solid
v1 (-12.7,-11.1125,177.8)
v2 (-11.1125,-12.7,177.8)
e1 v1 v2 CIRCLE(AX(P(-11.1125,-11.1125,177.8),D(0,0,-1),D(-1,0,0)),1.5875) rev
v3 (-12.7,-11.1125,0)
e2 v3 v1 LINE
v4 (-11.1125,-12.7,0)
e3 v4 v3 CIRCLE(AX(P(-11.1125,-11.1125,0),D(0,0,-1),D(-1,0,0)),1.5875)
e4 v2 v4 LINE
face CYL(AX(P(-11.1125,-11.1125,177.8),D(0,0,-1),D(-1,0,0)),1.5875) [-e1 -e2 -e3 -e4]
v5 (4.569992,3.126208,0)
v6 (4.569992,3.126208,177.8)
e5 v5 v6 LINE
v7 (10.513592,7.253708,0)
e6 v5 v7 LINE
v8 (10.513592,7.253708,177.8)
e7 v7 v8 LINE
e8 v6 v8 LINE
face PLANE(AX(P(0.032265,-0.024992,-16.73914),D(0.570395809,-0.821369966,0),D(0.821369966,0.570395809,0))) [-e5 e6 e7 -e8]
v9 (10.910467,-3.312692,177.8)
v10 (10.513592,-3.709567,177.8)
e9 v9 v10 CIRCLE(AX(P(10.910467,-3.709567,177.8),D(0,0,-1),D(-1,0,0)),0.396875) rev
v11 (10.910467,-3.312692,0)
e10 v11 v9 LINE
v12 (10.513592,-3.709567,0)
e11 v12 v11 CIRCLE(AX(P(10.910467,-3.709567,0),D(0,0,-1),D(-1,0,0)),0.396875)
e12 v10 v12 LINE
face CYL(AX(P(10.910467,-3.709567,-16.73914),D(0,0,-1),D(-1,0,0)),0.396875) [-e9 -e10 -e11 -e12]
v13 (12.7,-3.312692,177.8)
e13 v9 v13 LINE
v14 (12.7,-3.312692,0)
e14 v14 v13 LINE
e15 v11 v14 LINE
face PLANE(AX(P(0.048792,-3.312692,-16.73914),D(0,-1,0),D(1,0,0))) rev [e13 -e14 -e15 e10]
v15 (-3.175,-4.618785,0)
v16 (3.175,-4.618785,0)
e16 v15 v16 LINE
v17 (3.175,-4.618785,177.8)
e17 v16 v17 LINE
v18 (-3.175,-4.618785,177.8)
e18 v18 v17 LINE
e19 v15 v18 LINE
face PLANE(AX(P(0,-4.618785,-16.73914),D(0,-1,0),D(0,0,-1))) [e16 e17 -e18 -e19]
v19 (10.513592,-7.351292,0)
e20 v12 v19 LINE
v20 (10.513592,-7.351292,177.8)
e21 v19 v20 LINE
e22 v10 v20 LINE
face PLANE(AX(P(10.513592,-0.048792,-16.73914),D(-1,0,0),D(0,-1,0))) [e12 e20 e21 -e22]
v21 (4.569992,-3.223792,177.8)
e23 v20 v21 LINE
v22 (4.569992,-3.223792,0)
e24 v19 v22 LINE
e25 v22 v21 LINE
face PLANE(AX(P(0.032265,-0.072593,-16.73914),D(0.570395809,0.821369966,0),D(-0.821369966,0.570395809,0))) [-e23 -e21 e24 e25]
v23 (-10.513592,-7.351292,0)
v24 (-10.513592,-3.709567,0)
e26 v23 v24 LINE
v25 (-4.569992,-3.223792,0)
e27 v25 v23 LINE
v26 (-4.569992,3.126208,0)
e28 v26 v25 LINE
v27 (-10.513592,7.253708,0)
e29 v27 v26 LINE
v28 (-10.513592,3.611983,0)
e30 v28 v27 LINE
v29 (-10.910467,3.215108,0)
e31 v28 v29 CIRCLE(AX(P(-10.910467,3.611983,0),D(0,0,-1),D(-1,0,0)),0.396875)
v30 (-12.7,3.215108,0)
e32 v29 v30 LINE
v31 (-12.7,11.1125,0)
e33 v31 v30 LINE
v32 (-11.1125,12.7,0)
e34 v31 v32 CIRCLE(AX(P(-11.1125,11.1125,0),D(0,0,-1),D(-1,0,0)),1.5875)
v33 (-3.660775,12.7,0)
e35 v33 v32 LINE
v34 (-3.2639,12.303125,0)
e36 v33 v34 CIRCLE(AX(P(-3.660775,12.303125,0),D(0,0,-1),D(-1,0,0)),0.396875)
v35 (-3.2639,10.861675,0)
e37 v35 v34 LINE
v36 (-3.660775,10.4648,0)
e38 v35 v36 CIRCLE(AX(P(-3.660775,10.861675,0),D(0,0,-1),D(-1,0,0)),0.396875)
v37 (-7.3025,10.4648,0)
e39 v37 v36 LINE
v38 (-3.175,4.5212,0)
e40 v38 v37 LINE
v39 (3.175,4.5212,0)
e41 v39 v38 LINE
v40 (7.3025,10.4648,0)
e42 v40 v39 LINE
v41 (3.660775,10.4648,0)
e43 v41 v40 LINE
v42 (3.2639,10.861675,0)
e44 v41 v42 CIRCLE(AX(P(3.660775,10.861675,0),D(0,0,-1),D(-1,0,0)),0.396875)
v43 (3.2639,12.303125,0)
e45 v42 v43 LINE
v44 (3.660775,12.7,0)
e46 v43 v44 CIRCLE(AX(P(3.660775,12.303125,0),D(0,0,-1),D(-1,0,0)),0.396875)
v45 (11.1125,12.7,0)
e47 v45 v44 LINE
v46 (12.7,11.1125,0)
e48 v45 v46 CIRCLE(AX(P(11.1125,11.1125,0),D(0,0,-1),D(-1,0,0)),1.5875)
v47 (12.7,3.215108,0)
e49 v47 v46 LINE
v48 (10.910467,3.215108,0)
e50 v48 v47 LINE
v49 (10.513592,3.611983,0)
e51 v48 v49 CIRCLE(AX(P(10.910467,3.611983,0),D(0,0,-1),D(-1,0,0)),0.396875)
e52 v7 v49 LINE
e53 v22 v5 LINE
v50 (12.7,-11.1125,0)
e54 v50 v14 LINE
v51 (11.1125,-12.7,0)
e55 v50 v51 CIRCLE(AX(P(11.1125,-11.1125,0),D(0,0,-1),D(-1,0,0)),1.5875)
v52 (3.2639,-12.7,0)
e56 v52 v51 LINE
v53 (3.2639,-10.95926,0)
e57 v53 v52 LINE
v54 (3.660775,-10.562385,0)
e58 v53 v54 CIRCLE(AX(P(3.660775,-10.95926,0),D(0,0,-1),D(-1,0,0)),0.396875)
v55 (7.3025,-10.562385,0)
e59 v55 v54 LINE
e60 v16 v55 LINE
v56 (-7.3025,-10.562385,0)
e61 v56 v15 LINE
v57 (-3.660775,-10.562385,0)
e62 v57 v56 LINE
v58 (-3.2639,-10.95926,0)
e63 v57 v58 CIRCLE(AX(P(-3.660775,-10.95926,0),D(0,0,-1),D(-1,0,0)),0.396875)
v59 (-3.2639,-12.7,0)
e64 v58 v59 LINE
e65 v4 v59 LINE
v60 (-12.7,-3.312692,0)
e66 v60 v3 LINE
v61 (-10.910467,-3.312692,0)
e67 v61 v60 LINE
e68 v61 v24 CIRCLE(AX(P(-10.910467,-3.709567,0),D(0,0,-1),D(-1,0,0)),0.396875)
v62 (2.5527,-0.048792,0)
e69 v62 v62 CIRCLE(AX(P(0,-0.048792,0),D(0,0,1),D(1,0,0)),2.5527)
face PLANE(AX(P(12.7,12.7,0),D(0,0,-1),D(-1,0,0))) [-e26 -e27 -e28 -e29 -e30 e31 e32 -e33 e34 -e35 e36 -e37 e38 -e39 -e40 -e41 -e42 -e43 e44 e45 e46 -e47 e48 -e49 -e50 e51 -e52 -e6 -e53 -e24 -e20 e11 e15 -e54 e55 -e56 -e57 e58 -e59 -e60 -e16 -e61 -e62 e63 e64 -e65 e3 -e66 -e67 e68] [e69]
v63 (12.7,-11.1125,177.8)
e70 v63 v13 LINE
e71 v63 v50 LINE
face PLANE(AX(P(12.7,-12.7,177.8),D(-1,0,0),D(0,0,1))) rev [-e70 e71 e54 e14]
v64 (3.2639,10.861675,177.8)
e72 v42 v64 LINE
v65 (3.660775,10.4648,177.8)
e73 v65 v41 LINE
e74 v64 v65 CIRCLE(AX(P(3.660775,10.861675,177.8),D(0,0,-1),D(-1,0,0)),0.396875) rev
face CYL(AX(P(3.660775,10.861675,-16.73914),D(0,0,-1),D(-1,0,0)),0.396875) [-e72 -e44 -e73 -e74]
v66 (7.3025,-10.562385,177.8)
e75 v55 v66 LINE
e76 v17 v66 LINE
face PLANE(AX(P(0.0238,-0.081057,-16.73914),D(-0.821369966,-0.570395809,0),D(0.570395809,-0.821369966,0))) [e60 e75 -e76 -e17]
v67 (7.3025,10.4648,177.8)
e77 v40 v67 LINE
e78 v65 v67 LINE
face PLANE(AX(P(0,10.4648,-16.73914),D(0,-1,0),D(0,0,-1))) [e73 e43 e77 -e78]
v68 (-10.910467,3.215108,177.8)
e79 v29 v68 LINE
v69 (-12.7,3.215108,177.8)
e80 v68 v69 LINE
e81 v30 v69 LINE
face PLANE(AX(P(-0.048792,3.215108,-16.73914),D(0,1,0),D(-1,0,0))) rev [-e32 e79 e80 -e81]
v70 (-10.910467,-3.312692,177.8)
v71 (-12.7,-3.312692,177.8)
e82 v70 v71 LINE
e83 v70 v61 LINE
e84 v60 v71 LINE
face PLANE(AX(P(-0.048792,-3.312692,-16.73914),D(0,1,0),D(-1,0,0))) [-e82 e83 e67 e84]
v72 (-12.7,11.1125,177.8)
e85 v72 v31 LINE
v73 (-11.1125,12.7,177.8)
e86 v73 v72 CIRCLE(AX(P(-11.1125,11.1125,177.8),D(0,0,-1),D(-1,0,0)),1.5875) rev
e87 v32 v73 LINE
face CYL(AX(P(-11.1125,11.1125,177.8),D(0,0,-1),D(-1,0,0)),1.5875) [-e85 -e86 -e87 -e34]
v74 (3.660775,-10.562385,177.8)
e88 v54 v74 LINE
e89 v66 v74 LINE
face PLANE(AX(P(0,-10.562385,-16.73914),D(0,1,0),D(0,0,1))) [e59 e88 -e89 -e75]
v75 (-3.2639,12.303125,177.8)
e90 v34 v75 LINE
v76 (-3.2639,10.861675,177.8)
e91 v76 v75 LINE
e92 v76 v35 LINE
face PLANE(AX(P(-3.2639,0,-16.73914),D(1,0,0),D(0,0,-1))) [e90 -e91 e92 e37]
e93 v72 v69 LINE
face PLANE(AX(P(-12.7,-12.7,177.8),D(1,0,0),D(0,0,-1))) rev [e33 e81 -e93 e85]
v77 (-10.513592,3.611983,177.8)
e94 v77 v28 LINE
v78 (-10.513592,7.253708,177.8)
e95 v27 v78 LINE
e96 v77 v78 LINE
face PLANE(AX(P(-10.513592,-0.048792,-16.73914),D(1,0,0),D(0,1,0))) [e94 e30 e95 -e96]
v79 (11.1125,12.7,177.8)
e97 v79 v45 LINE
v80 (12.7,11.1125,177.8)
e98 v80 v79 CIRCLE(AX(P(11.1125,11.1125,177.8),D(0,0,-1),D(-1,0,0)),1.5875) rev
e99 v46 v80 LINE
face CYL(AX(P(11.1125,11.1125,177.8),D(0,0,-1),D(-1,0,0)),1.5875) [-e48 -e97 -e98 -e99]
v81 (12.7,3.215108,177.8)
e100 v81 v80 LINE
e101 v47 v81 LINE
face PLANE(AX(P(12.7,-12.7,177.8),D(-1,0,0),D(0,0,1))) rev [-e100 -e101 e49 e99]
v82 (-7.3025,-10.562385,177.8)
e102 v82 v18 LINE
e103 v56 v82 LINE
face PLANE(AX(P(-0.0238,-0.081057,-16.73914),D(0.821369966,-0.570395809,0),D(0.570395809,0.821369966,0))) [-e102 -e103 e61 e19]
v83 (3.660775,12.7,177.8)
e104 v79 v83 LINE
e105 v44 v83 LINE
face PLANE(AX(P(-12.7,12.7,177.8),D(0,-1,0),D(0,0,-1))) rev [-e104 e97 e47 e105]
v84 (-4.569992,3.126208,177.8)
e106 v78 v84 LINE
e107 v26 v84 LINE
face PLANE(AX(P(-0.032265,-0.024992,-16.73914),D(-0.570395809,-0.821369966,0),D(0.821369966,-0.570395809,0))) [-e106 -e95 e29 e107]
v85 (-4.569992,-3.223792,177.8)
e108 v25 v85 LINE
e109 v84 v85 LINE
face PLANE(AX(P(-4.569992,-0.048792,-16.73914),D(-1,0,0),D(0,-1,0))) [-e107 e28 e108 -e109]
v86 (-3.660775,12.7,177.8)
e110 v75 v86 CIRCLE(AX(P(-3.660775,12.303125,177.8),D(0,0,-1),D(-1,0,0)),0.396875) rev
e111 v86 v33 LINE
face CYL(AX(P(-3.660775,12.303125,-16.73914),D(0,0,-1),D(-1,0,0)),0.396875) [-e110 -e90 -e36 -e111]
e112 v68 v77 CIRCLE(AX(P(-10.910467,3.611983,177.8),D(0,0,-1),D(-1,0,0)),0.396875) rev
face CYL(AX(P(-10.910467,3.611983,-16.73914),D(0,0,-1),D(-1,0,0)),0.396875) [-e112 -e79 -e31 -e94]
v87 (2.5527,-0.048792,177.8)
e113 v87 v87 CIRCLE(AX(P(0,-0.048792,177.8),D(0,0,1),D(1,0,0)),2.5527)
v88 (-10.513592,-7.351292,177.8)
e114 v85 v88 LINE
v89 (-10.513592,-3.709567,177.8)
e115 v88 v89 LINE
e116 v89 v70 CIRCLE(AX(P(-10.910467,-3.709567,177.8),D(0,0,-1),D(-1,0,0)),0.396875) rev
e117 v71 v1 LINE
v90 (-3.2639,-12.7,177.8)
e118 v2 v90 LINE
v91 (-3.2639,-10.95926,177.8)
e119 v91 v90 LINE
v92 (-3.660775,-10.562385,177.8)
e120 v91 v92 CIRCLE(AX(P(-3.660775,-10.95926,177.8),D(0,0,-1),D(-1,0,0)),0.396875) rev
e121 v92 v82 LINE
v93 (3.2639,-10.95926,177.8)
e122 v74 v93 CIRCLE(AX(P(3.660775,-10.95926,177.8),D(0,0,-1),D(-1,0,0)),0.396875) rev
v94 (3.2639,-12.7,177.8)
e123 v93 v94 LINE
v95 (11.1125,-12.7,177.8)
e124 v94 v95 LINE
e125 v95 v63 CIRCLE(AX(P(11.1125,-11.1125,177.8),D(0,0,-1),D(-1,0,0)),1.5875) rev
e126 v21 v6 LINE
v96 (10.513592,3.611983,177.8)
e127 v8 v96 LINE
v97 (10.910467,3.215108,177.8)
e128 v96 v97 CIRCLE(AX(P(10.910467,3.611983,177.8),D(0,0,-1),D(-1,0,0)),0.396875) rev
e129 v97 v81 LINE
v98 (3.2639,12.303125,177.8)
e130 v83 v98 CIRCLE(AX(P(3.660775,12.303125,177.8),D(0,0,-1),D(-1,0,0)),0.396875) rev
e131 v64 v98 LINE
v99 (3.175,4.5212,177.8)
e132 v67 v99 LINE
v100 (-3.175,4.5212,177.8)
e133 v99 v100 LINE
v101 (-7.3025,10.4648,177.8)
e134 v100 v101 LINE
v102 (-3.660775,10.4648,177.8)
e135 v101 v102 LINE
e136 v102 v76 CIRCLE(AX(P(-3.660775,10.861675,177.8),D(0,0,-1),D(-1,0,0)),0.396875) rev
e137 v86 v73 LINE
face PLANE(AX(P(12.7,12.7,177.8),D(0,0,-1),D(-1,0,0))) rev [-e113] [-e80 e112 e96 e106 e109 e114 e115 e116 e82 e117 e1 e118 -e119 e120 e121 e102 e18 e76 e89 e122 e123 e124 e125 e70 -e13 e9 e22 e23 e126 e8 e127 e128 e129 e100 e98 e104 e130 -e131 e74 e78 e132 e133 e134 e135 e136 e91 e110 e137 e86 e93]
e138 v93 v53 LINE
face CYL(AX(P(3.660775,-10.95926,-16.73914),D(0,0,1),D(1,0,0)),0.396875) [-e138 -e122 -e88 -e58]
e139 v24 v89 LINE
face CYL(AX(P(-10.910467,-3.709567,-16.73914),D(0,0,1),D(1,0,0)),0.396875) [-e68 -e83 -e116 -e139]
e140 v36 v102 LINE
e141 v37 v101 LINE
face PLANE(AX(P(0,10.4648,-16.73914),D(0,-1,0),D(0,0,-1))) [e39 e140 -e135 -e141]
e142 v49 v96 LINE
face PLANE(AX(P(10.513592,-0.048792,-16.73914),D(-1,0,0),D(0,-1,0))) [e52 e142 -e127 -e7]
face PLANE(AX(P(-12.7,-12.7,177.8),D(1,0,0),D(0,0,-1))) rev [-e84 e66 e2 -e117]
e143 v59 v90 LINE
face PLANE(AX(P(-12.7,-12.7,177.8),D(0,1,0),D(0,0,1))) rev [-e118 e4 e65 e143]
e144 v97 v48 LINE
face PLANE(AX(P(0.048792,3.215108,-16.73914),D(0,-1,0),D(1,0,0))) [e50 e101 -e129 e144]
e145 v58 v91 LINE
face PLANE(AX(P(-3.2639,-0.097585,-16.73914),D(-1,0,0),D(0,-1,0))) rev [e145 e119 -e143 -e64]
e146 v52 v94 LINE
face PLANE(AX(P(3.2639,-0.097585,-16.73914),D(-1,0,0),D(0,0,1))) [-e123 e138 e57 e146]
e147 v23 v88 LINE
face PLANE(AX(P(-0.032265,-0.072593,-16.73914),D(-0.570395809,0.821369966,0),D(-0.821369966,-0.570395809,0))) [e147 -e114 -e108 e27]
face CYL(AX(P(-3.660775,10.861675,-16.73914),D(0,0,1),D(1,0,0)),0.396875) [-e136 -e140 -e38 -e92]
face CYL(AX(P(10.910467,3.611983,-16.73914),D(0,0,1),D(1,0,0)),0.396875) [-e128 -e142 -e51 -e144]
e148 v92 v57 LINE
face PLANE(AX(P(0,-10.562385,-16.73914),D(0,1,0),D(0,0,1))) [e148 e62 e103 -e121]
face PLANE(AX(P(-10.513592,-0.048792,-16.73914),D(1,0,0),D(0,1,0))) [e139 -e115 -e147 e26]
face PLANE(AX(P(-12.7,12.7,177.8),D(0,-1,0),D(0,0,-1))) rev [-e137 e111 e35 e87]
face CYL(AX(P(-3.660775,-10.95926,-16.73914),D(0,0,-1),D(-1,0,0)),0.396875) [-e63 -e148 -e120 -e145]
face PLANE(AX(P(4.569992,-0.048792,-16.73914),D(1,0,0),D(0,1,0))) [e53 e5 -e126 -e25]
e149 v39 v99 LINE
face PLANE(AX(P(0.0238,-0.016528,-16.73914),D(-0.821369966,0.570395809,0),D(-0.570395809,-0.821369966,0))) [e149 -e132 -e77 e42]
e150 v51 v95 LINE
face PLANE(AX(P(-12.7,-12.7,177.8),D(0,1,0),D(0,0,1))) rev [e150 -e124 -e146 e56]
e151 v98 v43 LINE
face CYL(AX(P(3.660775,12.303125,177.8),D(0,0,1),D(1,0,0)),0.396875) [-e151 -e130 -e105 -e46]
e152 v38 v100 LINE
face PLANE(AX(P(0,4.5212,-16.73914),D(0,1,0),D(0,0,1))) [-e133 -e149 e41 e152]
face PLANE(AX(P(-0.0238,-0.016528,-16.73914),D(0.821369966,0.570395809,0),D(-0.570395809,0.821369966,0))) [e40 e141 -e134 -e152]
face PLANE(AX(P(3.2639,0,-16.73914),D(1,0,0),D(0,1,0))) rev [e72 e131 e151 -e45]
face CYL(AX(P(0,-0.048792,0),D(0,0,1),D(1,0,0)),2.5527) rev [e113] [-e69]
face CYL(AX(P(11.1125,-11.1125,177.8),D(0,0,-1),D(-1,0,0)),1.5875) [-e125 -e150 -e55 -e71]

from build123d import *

# Parameters (mm, degrees)
SKETCH1_W           = 25.4
SKETCH1_H           = 25.4
BOSS_EXTRUDE1_DEPTH = 177.8
FILLET1_R           = 1.5875
HOLE1_OUTLINE_R     = 2.5527
HOLE1_DEPTH         = 177.8
SKETCH7_W           = 6.5278
SKETCH7_H           = 2.2352
CUT_EXTRUDE2_DEPTH  = 177.8
FILLET4_R           = 0.396875
CIRPATTERN2_DEPTH   = 177.8


# Read off the part's stored shape, not the designer's step: Hole1, CirPattern2
with BuildPart() as part:
    # Sketch1 → Boss-Extrude1 (new body)
    with BuildSketch(Plane.XY):
        Rectangle(SKETCH1_W, SKETCH1_H)
    extrude(amount=BOSS_EXTRUDE1_DEPTH)

    # Fillet1
    fillet1_edges = [part.edges().sort_by_distance(p)[0] for p in [
        (12.7, -12.7, 88.9),
        (-12.7, -12.7, 88.9),
        (-12.7, 12.7, 88.9),
        (12.7, 12.7, 88.9),
    ]]
    fillet(fillet1_edges, radius=FILLET1_R)

    # Hole1 outline → Hole1 (cut)
    with BuildSketch(Plane.XY):
        with Locations((0, -0.048792482)):
            Circle(HOLE1_OUTLINE_R)
    extrude(amount=HOLE1_DEPTH, mode=Mode.SUBTRACT)

    # Sketch7 → Cut-Extrude2 (cut)
    with BuildSketch(Plane.XY.offset(177.8)):
        with Locations((0, 11.5824)):
            Rectangle(SKETCH7_W, SKETCH7_H)
        Polygon((-3.175, 4.5212), (-7.3025, 10.4648), (7.3025, 10.4648), (3.175, 4.5212), align=None)
    extrude(amount=-CUT_EXTRUDE2_DEPTH, mode=Mode.SUBTRACT)

    # Fillet4
    fillet4_edges = [part.edges().sort_by_distance(p)[0] for p in [
        (-3.2639, 10.4648, 88.9),
        (-3.2639, 12.7, 88.9),
        (3.2639, 12.7, 88.9),
        (3.2639, 10.4648, 88.9),
    ]]
    fillet(fillet4_edges, radius=FILLET4_R)

    # CirPattern2 outline → CirPattern2 (cut)
    with BuildSketch(Plane.XY):
        with BuildLine():
            ThreePointArc((-3.660775, -10.562384964), (-3.380141996, -10.67862696), (-3.2639, -10.959259964))
            Line((-3.2639, -10.959259964), (-3.2639, -12.7))
            Line((-3.2639, -12.7), (3.2639, -12.7))
            Line((3.2639, -12.7), (3.2639, -10.959259964))
            ThreePointArc((3.2639, -10.959259964), (3.380141996, -10.67862696), (3.660775, -10.562384964))
            Line((3.660775, -10.562384964), (7.3025, -10.562384964))
            Line((7.3025, -10.562384964), (3.175, -4.618784964))
            Line((3.175, -4.618784964), (-3.175, -4.618784964))
            Line((-3.175, -4.618784964), (-7.3025, -10.562384964))
            Line((-7.3025, -10.562384964), (-3.660775, -10.562384964))
        make_face()
        with BuildLine():
            Line((-12.7, -3.312692482), (-10.910467482, -3.312692482))
            ThreePointArc((-10.910467482, -3.312692482), (-10.629834478, -3.428934478), (-10.513592482, -3.709567482))
            Line((-10.513592482, -3.709567482), (-10.513592482, -7.351292482))
            Line((-10.513592482, -7.351292482), (-4.569992482, -3.223792482))
            Line((-4.569992482, -3.223792482), (-4.569992482, 3.126207518))
            Line((-4.569992482, 3.126207518), (-10.513592482, 7.253707518))
            Line((-10.513592482, 7.253707518), (-10.513592482, 3.611982518))
            ThreePointArc((-10.513592482, 3.611982518), (-10.629834478, 3.331349514), (-10.910467482, 3.215107518))
            Line((-10.910467482, 3.215107518), (-12.7, 3.215107518))
            Line((-12.7, 3.215107518), (-12.7, -3.312692482))
        make_face()
        with BuildLine():
            ThreePointArc((10.513592482, -3.709567482), (10.629834478, -3.428934478), (10.910467482, -3.312692482))
            Line((10.910467482, -3.312692482), (12.7, -3.312692482))
            Line((12.7, -3.312692482), (12.7, 3.215107518))
            Line((12.7, 3.215107518), (10.910467482, 3.215107518))
            ThreePointArc((10.910467482, 3.215107518), (10.629834478, 3.331349514), (10.513592482, 3.611982518))
            Line((10.513592482, 3.611982518), (10.513592482, 7.253707518))
            Line((10.513592482, 7.253707518), (4.569992482, 3.126207518))
            Line((4.569992482, 3.126207518), (4.569992482, -3.223792482))
            Line((4.569992482, -3.223792482), (10.513592482, -7.351292482))
            Line((10.513592482, -7.351292482), (10.513592482, -3.709567482))
        make_face()
    extrude(amount=CIRPATTERN2_DEPTH, mode=Mode.SUBTRACT)


solid = part.part
